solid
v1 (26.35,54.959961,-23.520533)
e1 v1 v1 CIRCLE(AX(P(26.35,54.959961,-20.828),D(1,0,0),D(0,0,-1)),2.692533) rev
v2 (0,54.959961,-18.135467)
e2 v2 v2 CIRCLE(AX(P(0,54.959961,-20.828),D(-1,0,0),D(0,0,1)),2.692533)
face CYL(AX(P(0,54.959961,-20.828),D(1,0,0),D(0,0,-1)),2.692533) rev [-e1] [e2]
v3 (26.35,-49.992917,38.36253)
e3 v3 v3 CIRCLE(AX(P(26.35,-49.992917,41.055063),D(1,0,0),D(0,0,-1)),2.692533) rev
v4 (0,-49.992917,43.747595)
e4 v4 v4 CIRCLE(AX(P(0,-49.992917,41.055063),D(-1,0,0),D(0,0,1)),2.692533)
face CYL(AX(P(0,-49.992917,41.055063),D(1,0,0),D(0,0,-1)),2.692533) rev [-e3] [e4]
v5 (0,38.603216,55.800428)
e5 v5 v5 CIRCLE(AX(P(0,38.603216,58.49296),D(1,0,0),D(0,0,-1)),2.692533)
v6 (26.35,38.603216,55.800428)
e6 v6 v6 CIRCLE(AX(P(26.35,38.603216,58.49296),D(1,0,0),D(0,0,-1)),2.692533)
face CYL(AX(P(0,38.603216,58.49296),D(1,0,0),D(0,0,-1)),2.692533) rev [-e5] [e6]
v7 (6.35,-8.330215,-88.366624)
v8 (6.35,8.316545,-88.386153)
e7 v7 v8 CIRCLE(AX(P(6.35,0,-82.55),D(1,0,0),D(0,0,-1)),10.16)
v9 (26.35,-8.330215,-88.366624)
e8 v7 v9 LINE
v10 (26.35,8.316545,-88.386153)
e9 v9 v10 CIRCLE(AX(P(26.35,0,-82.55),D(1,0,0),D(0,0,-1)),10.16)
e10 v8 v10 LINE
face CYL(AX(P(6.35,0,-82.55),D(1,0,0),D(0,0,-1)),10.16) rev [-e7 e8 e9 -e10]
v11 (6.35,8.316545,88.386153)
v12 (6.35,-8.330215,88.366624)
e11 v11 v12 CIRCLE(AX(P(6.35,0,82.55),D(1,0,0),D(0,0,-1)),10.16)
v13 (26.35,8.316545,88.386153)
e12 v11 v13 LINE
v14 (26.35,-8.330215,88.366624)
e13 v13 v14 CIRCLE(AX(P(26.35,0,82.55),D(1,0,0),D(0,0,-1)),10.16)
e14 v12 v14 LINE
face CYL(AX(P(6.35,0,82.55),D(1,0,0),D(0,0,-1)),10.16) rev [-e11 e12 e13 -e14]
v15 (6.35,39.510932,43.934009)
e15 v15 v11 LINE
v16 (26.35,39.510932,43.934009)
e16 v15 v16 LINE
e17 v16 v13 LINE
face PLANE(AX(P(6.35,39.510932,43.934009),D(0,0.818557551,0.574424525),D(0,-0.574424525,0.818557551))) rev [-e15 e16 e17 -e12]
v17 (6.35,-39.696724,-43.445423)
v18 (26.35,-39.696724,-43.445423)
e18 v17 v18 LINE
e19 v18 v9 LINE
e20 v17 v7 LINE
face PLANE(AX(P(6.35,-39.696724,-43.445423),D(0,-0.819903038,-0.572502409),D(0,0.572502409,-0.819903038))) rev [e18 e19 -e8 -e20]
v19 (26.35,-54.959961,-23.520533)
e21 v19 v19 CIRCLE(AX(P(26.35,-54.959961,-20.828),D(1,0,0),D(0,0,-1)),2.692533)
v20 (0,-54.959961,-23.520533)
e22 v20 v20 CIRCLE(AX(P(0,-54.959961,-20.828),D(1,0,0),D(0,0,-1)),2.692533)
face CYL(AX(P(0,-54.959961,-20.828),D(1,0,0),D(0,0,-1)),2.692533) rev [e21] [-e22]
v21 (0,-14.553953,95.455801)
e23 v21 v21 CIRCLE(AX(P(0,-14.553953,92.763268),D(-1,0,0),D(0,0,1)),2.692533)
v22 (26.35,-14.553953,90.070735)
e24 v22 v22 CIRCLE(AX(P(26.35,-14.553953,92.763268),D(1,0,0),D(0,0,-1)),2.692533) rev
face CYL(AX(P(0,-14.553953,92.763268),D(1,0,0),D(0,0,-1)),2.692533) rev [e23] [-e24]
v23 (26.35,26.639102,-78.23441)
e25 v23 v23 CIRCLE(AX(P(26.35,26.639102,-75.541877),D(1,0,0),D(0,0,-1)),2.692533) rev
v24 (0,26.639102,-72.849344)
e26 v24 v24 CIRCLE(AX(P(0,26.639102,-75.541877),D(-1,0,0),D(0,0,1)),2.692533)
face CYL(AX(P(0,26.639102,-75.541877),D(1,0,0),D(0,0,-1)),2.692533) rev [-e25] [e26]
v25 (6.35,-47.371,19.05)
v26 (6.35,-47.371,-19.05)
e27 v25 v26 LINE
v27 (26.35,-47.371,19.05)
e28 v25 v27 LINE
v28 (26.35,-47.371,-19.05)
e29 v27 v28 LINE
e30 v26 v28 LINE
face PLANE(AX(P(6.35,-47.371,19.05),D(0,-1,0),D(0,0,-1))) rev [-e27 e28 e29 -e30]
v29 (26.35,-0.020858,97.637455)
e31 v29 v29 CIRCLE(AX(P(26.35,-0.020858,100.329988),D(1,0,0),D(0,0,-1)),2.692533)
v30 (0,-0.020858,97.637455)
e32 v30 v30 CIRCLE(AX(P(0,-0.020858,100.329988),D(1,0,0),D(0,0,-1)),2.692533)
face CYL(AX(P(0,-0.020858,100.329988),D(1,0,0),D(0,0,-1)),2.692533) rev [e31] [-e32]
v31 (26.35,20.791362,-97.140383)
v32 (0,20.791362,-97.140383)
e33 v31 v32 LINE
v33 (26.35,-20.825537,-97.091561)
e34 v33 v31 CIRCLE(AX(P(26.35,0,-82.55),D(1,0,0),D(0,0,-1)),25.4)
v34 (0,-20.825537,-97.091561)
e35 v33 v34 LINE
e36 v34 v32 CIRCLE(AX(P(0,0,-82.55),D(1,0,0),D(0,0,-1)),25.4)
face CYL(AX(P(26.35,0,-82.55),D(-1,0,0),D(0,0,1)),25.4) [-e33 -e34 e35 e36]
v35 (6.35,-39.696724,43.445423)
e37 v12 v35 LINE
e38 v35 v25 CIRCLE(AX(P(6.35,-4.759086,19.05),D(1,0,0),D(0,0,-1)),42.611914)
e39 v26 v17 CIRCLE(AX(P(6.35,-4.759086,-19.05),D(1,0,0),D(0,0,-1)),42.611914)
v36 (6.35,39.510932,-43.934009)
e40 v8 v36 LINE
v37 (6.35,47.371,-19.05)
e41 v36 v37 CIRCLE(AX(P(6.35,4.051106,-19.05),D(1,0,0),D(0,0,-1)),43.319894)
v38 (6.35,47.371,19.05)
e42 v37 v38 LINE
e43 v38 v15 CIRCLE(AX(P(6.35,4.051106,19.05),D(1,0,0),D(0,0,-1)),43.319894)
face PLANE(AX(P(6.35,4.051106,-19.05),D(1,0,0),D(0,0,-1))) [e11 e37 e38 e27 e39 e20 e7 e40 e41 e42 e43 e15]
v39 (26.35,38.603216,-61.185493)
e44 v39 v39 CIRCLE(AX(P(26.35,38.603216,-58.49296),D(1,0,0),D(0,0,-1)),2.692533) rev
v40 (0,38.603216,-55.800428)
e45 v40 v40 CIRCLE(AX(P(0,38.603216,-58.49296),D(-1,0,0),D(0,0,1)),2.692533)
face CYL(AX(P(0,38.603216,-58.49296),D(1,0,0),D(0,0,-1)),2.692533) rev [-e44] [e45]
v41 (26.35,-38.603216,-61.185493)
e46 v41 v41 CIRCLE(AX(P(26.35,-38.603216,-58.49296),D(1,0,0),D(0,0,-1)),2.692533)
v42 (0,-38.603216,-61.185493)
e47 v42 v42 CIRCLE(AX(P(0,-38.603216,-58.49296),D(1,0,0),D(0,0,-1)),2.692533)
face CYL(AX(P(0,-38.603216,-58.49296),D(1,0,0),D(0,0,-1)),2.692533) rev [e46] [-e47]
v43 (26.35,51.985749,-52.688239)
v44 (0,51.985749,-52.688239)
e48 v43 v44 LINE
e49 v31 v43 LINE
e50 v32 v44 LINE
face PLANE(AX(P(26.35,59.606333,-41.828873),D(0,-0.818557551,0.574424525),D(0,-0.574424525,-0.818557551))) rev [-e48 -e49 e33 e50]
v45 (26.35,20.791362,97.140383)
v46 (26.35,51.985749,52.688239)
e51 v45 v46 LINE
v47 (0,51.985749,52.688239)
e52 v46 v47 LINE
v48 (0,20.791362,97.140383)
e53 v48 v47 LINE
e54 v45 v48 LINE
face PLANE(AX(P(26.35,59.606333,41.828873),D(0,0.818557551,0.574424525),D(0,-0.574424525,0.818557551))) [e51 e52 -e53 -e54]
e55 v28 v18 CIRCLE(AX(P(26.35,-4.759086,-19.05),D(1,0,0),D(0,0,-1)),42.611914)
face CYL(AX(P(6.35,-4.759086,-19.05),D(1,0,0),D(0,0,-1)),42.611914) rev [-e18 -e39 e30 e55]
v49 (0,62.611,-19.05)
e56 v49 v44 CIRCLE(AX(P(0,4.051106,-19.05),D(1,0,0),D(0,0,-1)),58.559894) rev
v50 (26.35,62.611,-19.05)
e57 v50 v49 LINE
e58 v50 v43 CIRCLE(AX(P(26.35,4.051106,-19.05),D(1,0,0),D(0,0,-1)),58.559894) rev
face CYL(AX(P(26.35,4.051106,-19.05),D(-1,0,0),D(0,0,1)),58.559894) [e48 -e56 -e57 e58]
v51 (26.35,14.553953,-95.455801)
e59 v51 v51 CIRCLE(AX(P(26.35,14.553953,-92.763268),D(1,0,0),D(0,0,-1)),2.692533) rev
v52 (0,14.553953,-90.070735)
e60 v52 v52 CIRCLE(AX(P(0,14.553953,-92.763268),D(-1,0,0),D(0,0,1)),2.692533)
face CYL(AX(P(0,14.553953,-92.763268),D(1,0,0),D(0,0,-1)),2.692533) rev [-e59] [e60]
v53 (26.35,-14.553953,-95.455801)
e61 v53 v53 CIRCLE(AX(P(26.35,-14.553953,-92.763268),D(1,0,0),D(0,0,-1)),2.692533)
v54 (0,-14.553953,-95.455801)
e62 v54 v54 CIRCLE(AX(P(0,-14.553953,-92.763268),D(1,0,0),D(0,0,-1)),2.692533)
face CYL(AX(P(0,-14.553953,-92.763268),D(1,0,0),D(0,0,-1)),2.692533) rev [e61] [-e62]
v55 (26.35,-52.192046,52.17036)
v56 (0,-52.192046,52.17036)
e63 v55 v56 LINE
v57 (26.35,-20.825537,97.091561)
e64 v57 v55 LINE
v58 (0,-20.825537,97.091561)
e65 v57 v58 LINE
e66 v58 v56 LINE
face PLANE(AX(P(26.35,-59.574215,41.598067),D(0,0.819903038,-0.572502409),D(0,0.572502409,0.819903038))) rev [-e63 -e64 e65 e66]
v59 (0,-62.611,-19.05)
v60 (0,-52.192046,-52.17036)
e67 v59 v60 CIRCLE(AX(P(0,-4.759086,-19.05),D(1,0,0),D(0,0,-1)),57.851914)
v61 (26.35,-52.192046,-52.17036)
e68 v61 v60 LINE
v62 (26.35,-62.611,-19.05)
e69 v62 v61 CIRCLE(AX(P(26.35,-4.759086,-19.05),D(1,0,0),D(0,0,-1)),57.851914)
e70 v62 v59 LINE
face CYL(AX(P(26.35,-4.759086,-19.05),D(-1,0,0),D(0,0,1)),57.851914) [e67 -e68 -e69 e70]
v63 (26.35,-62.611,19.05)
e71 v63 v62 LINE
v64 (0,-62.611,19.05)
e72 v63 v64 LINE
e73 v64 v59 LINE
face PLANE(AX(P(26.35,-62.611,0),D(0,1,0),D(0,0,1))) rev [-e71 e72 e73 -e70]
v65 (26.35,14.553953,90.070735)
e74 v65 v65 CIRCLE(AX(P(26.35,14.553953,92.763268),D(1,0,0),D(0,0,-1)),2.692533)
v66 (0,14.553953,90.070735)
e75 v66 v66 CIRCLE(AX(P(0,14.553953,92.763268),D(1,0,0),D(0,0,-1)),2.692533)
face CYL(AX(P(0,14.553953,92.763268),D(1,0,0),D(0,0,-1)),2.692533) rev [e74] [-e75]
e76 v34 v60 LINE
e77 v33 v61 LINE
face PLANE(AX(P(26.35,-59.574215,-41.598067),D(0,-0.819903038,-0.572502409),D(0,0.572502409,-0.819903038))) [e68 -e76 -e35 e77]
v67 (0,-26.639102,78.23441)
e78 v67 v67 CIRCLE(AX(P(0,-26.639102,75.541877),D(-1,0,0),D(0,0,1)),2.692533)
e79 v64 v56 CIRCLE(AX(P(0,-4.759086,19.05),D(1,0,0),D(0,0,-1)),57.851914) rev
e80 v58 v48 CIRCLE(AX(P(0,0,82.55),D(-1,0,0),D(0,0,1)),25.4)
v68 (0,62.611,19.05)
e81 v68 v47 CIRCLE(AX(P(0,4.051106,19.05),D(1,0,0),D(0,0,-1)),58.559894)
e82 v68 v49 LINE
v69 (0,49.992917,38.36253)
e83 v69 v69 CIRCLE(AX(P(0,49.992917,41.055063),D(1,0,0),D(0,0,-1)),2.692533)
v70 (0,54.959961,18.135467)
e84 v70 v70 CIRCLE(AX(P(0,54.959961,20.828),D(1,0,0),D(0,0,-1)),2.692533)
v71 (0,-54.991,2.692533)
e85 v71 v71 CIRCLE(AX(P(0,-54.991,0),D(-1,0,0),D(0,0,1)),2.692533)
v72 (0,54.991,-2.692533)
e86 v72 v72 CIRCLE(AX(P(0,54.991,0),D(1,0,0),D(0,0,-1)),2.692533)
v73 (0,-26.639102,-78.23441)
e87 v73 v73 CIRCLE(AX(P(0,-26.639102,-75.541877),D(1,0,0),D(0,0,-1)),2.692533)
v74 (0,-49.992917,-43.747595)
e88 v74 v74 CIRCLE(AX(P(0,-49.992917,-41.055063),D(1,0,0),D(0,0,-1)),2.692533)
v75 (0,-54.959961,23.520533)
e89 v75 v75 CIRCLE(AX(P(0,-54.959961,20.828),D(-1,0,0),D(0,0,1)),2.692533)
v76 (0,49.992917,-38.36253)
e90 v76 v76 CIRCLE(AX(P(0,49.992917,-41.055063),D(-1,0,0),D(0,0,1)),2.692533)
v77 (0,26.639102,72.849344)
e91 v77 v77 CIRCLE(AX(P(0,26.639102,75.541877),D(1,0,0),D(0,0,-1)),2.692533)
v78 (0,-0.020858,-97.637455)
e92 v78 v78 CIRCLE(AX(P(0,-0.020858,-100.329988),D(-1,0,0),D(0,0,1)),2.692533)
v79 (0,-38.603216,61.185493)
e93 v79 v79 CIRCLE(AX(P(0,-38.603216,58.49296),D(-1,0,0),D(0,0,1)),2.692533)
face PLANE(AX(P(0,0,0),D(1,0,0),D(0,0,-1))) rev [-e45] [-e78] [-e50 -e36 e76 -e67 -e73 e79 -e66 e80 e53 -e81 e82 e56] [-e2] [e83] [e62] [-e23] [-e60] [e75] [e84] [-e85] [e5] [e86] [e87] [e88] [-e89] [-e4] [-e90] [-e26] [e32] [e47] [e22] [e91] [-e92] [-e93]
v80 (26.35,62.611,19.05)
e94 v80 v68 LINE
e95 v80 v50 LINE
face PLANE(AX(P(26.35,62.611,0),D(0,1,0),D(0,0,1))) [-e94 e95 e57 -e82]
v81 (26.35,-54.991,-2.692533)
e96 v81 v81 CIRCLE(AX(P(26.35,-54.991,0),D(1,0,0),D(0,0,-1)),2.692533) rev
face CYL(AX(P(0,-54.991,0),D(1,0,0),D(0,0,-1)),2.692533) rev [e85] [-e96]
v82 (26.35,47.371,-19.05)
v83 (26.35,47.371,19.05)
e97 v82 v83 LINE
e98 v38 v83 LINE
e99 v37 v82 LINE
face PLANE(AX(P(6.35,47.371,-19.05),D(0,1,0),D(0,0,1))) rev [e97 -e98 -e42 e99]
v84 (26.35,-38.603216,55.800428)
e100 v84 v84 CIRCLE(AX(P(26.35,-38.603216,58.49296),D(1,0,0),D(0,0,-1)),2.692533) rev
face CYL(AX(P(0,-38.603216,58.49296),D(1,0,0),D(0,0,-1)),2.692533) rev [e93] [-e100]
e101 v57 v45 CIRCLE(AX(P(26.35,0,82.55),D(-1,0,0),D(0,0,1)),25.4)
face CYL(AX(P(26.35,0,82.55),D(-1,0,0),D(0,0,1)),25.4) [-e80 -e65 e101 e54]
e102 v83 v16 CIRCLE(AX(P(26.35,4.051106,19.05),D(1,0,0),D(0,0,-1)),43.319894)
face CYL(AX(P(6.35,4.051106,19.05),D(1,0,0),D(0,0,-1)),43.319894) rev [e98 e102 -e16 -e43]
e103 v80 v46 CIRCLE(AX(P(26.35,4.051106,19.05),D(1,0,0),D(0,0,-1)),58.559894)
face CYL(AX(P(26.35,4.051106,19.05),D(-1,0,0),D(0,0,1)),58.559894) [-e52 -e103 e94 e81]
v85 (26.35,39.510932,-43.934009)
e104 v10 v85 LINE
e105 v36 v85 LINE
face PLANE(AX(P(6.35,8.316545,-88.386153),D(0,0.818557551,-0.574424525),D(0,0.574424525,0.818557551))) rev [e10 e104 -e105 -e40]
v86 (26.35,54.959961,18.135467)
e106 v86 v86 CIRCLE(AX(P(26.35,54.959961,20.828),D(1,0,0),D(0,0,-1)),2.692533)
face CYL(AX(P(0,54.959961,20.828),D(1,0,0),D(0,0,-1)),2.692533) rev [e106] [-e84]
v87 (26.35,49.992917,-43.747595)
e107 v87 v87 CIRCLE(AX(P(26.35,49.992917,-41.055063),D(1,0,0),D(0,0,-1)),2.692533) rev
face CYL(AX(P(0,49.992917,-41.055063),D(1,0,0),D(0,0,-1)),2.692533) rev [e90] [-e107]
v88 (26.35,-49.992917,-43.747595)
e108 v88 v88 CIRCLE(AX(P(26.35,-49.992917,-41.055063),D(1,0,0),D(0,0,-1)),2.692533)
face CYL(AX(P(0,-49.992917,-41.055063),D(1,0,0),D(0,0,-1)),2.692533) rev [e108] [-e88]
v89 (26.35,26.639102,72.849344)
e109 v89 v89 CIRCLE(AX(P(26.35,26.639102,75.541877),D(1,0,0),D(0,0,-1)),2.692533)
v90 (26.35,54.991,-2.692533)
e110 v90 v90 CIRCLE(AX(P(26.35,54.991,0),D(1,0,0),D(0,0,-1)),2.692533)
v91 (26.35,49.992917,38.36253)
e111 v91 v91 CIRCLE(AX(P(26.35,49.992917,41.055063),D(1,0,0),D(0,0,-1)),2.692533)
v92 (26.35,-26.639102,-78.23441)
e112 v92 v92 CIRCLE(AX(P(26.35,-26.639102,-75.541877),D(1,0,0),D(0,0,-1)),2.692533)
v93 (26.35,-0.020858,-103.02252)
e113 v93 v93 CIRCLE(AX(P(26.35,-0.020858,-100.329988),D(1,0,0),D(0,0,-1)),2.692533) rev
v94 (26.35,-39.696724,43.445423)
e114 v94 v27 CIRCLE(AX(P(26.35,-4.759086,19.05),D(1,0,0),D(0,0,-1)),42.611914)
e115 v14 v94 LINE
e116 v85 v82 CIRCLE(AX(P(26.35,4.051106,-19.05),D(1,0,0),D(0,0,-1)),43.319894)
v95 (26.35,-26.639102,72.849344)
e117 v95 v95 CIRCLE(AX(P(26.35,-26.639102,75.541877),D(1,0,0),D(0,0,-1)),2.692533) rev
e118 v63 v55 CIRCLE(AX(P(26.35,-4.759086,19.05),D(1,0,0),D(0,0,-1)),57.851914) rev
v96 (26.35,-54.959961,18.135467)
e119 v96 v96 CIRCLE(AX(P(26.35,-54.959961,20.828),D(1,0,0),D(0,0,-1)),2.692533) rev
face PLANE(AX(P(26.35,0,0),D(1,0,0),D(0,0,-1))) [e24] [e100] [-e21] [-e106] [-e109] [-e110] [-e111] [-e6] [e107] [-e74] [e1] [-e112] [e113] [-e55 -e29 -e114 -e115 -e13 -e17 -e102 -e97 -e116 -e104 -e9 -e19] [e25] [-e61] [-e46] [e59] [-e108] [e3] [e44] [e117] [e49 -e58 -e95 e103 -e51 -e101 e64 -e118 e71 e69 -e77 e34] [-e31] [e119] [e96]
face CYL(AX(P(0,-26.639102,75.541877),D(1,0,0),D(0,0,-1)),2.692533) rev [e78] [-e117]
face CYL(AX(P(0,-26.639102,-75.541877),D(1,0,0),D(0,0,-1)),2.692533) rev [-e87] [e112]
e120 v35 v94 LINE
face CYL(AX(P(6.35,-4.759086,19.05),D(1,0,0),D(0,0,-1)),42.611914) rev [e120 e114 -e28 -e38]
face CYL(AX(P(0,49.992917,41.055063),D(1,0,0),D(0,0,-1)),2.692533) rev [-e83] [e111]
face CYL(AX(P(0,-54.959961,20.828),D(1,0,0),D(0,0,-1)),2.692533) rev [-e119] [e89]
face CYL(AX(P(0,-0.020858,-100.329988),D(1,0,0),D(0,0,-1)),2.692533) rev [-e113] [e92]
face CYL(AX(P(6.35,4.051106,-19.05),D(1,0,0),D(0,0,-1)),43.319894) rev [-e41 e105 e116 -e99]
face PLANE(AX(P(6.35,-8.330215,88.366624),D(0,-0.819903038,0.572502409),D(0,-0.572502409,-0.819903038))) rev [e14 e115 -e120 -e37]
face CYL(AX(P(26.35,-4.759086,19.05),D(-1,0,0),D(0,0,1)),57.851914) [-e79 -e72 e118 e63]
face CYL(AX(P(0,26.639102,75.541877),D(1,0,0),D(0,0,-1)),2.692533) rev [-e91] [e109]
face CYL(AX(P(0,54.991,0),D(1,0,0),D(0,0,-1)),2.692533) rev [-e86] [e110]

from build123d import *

# Parameters (mm, degrees)
BOSS_EXTRUDE1_DEPTH    = 26.35
CUT_EXTRUDE1_DEPTH     = 20
CUT_EXTRUDE3_START     = -26.35
CUT_EXTRUDE3_OUTLINE_R = 2.69253261
CUT_EXTRUDE3_DEPTH     = 26.35


# Read off the part's stored shape, not the designer's step: Cut-Extrude3
with BuildPart() as part:
    # Sketch1 → Boss-Extrude1 (new body)
    with BuildSketch(Plane(origin=(0, 0, 0), x_dir=(0, 0, -1), z_dir=(1, 0, 0))):
        with BuildLine():
            Line((19.05, 62.611), (-19.05, 62.611))
            ThreePointArc((-19.05, 62.611), (-36.688219036, 59.891543079), (-52.688239169, 51.985749479))
            Line((-52.688239169, 51.985749479), (-97.140382944, 20.791361801))
            ThreePointArc((-97.140382944, 20.791361801), (-107.949982522, -0.029797308), (-97.091561196, -20.82553716))
            Line((-97.091561196, -20.82553716), (-52.170359894, -52.19204611))
            ThreePointArc((-52.170359894, -52.19204611), (-36.41024798, -59.944824567), (-19.05, -62.611))
            Line((-19.05, -62.611), (19.05, -62.611))
            ThreePointArc((19.05, -62.611), (36.41024798, -59.944824567), (52.170359894, -52.19204611))
            Line((52.170359894, -52.19204611), (97.091561196, -20.82553716))
            ThreePointArc((97.091561196, -20.82553716), (107.949982522, -0.029797308), (97.140382944, 20.791361801))
            Line((97.140382944, 20.791361801), (52.688239169, 51.985749479))
            ThreePointArc((52.688239169, 51.985749479), (36.688219036, 59.891543079), (19.05, 62.611))
        make_face()
    extrude(amount=BOSS_EXTRUDE1_DEPTH)

    # Sketch2 → Cut-Extrude1 (cut)
    with BuildSketch(Plane(origin=(26.35, 0, 0), x_dir=(0, 0, -1), z_dir=(1, 0, 0))):
        with BuildLine():
            Line((19.05, 47.371), (-19.05, 47.371))
            ThreePointArc((-19.05, 47.371), (-32.09793649, 45.359271881), (-43.934009402, 39.510932398))
            Line((-43.934009402, 39.510932398), (-88.386153178, 8.31654472))
            ThreePointArc((-88.386153178, 8.31654472), (-92.709993009, -0.011918923), (-88.366624478, -8.330214864))
            Line((-88.366624478, -8.330214864), (-43.445423176, -39.696723814))
            ThreePointArc((-43.445423176, -39.696723814), (-31.837016725, -45.407178406), (-19.05, -47.371))
            Line((-19.05, -47.371), (19.05, -47.371))
            ThreePointArc((19.05, -47.371), (31.837016725, -45.407178406), (43.445423176, -39.696723814))
            Line((43.445423176, -39.696723814), (88.366624478, -8.330214864))
            ThreePointArc((88.366624478, -8.330214864), (92.709993009, -0.011918923), (88.386153178, 8.31654472))
            Line((88.386153178, 8.31654472), (43.934009402, 39.510932398))
            ThreePointArc((43.934009402, 39.510932398), (32.09793649, 45.359271881), (19.05, 47.371))
        make_face()
    extrude(amount=-CUT_EXTRUDE1_DEPTH, mode=Mode.SUBTRACT)

    # Cut-Extrude3 outline → Cut-Extrude3 (cut)
    with BuildSketch(Plane(origin=(26.35, 0, 0), x_dir=(0, 0, -1), z_dir=(1, 0, 0)).offset(CUT_EXTRUDE3_START)):
        with Locations((0, 54.991)):
            Circle(CUT_EXTRUDE3_OUTLINE_R)
        with Locations((20.828, 54.959960993)):
            Circle(CUT_EXTRUDE3_OUTLINE_R)
        with Locations((41.055062572, 49.992917233)):
            Circle(CUT_EXTRUDE3_OUTLINE_R)
        with Locations((58.492960359, 38.603215535)):
            Circle(CUT_EXTRUDE3_OUTLINE_R)
        with Locations((75.541877036, 26.639101521)):
            Circle(CUT_EXTRUDE3_OUTLINE_R)
        with Locations((92.763268061, 14.553953261)):
            Circle(CUT_EXTRUDE3_OUTLINE_R)
        with Locations((100.329987765, -0.020858116)):
            Circle(CUT_EXTRUDE3_OUTLINE_R)
        with Locations((92.763268061, -14.553953261)):
            Circle(CUT_EXTRUDE3_OUTLINE_R)
        with Locations((-20.828, 54.959960993)):
            Circle(CUT_EXTRUDE3_OUTLINE_R)
        with Locations((-41.055062572, 49.992917233)):
            Circle(CUT_EXTRUDE3_OUTLINE_R)
        with Locations((-58.492960359, 38.603215535)):
            Circle(CUT_EXTRUDE3_OUTLINE_R)
        with Locations((-75.541877036, 26.639101521)):
            Circle(CUT_EXTRUDE3_OUTLINE_R)
        with Locations((-92.763268061, 14.553953261)):
            Circle(CUT_EXTRUDE3_OUTLINE_R)
        with Locations((-100.329987765, -0.020858116)):
            Circle(CUT_EXTRUDE3_OUTLINE_R)
        with Locations((-92.763268061, -14.553953261)):
            Circle(CUT_EXTRUDE3_OUTLINE_R)
        with Locations((-75.541877036, -26.639101521)):
            Circle(CUT_EXTRUDE3_OUTLINE_R)
        with Locations((-58.492960359, -38.603215535)):
            Circle(CUT_EXTRUDE3_OUTLINE_R)
        with Locations((-41.055062572, -49.992917233)):
            Circle(CUT_EXTRUDE3_OUTLINE_R)
        with Locations((-20.828, -54.959960993)):
            Circle(CUT_EXTRUDE3_OUTLINE_R)
        with Locations((0, -54.991)):
            Circle(CUT_EXTRUDE3_OUTLINE_R)
        with Locations((20.828, -54.959960993)):
            Circle(CUT_EXTRUDE3_OUTLINE_R)
        with Locations((41.055062572, -49.992917233)):
            Circle(CUT_EXTRUDE3_OUTLINE_R)
        with Locations((58.492960359, -38.603215535)):
            Circle(CUT_EXTRUDE3_OUTLINE_R)
        with Locations((75.541877036, -26.639101521)):
            Circle(CUT_EXTRUDE3_OUTLINE_R)
    extrude(amount=CUT_EXTRUDE3_DEPTH, mode=Mode.SUBTRACT)


solid = part.part
